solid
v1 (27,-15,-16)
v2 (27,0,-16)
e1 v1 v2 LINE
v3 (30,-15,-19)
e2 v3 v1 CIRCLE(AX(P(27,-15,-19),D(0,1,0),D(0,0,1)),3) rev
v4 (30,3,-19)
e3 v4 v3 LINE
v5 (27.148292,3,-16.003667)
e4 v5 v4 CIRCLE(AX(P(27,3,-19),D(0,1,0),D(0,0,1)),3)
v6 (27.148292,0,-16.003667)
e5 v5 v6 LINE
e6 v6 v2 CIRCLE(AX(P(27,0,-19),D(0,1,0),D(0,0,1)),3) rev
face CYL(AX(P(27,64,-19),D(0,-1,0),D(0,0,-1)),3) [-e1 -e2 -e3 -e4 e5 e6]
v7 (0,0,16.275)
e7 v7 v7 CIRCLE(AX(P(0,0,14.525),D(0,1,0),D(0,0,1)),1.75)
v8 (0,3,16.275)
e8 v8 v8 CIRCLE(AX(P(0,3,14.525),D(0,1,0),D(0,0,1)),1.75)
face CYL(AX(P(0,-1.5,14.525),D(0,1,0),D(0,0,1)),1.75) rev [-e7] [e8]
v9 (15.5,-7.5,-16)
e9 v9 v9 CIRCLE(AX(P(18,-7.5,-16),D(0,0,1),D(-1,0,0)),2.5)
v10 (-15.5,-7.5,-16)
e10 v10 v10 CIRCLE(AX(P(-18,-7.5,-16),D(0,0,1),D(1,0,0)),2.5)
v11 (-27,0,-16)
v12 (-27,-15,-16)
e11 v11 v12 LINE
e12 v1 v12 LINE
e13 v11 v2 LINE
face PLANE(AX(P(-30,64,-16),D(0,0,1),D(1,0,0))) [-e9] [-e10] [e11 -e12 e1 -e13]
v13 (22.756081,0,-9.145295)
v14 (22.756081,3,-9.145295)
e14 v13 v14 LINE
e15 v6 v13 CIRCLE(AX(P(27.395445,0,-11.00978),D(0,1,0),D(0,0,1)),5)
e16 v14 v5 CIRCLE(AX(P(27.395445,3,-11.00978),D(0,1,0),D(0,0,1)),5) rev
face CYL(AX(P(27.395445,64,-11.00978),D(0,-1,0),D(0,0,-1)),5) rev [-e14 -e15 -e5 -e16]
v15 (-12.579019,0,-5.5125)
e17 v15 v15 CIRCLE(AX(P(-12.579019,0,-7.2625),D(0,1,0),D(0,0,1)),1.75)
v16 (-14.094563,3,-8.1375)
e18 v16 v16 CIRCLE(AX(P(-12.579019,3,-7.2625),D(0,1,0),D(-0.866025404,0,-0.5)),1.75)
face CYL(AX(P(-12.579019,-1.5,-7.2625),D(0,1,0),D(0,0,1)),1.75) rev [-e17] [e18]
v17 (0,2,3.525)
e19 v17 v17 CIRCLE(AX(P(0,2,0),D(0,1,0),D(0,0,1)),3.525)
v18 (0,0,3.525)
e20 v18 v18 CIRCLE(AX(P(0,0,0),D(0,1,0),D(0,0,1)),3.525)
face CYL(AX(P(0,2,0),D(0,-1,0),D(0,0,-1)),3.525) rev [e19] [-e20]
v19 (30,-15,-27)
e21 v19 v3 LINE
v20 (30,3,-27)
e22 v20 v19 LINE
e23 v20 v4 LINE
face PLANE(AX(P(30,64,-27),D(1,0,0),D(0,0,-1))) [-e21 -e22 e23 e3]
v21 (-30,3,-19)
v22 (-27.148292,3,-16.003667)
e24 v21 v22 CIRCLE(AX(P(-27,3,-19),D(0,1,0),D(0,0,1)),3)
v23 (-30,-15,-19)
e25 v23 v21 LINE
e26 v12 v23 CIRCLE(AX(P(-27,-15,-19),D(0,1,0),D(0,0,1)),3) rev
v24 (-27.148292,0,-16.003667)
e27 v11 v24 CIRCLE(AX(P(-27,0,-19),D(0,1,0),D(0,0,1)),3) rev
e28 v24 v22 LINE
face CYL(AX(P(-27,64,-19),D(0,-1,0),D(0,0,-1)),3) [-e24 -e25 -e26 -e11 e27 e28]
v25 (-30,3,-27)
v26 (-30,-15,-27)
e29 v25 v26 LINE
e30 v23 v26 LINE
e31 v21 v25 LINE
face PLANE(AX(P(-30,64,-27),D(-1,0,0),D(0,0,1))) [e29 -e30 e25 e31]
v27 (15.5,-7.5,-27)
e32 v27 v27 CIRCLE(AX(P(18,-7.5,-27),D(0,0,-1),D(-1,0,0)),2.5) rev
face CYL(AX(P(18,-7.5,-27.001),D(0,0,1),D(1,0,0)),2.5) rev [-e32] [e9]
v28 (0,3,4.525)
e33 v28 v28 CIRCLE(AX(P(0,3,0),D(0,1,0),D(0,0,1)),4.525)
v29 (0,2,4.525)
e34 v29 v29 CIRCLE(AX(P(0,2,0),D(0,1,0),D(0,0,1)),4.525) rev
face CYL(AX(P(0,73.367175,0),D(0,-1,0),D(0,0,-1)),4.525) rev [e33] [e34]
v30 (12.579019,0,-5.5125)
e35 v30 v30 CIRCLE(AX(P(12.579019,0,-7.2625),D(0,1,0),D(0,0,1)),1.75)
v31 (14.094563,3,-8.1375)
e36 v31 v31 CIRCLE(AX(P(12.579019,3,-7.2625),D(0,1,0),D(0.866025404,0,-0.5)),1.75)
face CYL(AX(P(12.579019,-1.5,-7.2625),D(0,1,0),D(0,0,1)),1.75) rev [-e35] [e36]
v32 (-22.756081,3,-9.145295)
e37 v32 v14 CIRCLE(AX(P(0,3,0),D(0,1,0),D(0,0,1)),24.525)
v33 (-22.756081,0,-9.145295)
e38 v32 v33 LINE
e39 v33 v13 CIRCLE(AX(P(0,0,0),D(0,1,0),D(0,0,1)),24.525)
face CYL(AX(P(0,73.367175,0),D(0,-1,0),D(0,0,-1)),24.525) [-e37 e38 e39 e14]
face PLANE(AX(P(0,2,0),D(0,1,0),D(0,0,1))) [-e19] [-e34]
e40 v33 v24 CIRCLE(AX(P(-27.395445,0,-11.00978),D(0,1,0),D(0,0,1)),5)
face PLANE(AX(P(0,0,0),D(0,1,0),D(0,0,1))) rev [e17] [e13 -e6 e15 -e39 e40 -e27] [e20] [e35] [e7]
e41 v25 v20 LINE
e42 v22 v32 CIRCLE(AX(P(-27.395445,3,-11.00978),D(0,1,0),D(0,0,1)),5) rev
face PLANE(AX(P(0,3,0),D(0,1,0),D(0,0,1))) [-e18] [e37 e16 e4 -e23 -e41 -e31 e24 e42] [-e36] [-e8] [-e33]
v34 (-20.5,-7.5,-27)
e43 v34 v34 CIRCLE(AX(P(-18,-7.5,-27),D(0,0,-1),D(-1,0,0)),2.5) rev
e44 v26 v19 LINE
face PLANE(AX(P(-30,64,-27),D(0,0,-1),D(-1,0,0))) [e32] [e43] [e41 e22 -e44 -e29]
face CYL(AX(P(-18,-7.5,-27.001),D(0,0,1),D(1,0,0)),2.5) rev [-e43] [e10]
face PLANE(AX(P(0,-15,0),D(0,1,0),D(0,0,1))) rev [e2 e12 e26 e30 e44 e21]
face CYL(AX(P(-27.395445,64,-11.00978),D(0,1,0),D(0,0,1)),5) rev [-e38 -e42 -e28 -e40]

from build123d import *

# Parameters (mm, degrees)
SKETCH1_R                       = 4.525
SKETCH1_R_2                     = 3.525
BOSS_EXTRUDE1_DEPTH             = 2
SKETCH1_5_R                     = 24.525
SKETCH1_5_R_2                   = 4.525
BOSS_EXTRUDE3_DEPTH             = 3
SKETCH2_R                       = 1.75
CUT_EXTRUDE1_DEPTH              = 4.5
CIRPATTERN1_COUNT               = 3
SKETCH9_W                       = 60
SKETCH9_H                       = 11
BOSS_EXTRUDE7_DEPTH             = 15
BOSS_EXTRUDE7_DIRECTION_2_REACH = 36.813
CUT_EXTRUDE3_REACH              = 54.605
SKETCH10_R                      = 2.5
FILLET4_R                       = 3
FILLET5_R                       = 5


with BuildPart() as part:
    # Sketch1 → Boss-Extrude1 (new body)
    with BuildSketch(Plane(origin=(0, 0, 0), x_dir=(1, 0, 0), z_dir=(0, 1, 0))):
        with Locations(Location((0, 0, 0), (0, 0, 270))):
            Circle(SKETCH1_R)
        with Locations(Location((0, 0, 0), (0, 0, 270))):
            Circle(SKETCH1_R_2, mode=Mode.SUBTRACT)
    extrude(amount=BOSS_EXTRUDE1_DEPTH)

    # Sketch1<5> → Boss-Extrude3 (add)
    with BuildSketch(Plane(origin=(0, 0, 0), x_dir=(1, 0, 0), z_dir=(0, 1, 0))):
        with Locations(Location((0, 0, 0), (0, 0, 270))):
            Circle(SKETCH1_5_R)
        with Locations(Location((0, 0, 0), (0, 0, 270))):
            Circle(SKETCH1_5_R_2, mode=Mode.SUBTRACT)
    extrude(amount=BOSS_EXTRUDE3_DEPTH)

    # Sketch2 → Cut-Extrude1 (cut)
    with BuildSketch(Plane(origin=(0, 3, 0), x_dir=(1, 0, 0), z_dir=(0, 1, 0))):
        with Locations(Location((0, -14.525, 0), (0, 0, 270))):
            Circle(SKETCH2_R)
    cut_extrude1 = extrude(amount=-CUT_EXTRUDE1_DEPTH, mode=Mode.SUBTRACT)

    # CirPattern1: Cut-Extrude1 ×3 about axis
    cirpattern1_axis = Axis((0, 0, 0), (0, 1, 0))
    for i in range(1, CIRPATTERN1_COUNT):
        add(cut_extrude1.rotate(cirpattern1_axis, i * 360 / CIRPATTERN1_COUNT), mode=Mode.SUBTRACT)

    # Sketch9 → Boss-Extrude7 (add)
    with BuildSketch(Plane.XZ):
        with Locations((0, -21.5)):
            Rectangle(SKETCH9_W, SKETCH9_H)
    extrude(amount=BOSS_EXTRUDE7_DEPTH)

    # Boss-Extrude7 direction 2: up to this face of the body (flat: up to its plane)
    boss_extrude7_direction_2_end = Plane(part.part.faces().sort_by_distance((0, 3, -23.831328248))[0])
    # Sketch9 → Boss-Extrude7 direction 2 (add, up to the picked face)
    with BuildSketch(Plane.XZ, mode=Mode.PRIVATE) as boss_extrude7_direction_2_sk1:
        with Locations((0, -21.5)):
            Rectangle(SKETCH9_W, SKETCH9_H)
    boss_extrude7_direction_2_tool1 = split(extrude(boss_extrude7_direction_2_sk1.sketch, amount=-BOSS_EXTRUDE7_DIRECTION_2_REACH, mode=Mode.PRIVATE), bisect_by=boss_extrude7_direction_2_end, keep=Keep.BOTH, mode=Mode.PRIVATE)
    add(boss_extrude7_direction_2_tool1.solids().sort_by(Axis((0, 0, -21.5), (0, 1, 0)))[0])

    # Sketch10 → Cut-Extrude3 (cut, up to next)
    with BuildSketch(Plane.XY.offset(-16), mode=Mode.PRIVATE) as cut_extrude3_sk1:
        with Locations((-18, -7.5)):
            Circle(SKETCH10_R)
    cut_extrude3_tool1 = extrude(cut_extrude3_sk1.sketch, amount=-CUT_EXTRUDE3_REACH, mode=Mode.PRIVATE) & part.part
    # Sketch10 → Cut-Extrude3 (cut, up to next)
    with BuildSketch(Plane.XY.offset(-16), mode=Mode.PRIVATE) as cut_extrude3_sk2:
        with Locations(Location((18, -7.5, 0), (0, 0, 180))):
            Circle(SKETCH10_R)
    cut_extrude3_tool2 = extrude(cut_extrude3_sk2.sketch, amount=-CUT_EXTRUDE3_REACH, mode=Mode.PRIVATE) & part.part
    add(cut_extrude3_tool1.solids().sort_by_distance((-18, -7.5, -16))[0], mode=Mode.SUBTRACT)
    add(cut_extrude3_tool2.solids().sort_by_distance((18, -7.5, -16))[0], mode=Mode.SUBTRACT)

    # Fillet4
    fillet4_edges = [part.edges().sort_by_distance(p)[0] for p in [
        (-30, -6, -16),
        (30, -6, -16),
    ]]
    fillet(fillet4_edges, radius=FILLET4_R)

    # Fillet5
    # the kernel refuses this fillet: 5 mm, written as the material it adds along each edge
    with BuildSketch(Plane(origin=(-18.586974606, 3, -16), x_dir=(-0.999999908254526, 0, -0.0004283584240869523), z_dir=(0, -1, 0))) as fillet5_piece_1:
        with BuildLine():
            CenterArc((8.806331501, -4.993993224), FILLET5_R, 92.808774222, 109.061067494)
            Line((4.166169243, -6.856489993), (3.702153017, -7.04273967))
            ThreePointArc((3.702153017, -7.04273967), (1.938057952, -3.516366711), (-0.379079034, -0.326035406))
            Line((-0.379079034, -0.326035406), (0.000214179, 0.499999954))
            ThreePointArc((0.000214179, 0.499999954), (8.413238801, 0.496396164), (8.536816511, 0.499399322))
            Line((8.536816511, 0.499399322), (8.561317874, 0))
        make_face()
    extrude(amount=3)
    with BuildSketch(Plane(origin=(18.586974606, 3, -16), x_dir=(0.999999908254526, 0, -0.0004283584240865375), z_dir=(0, -1, 0))) as fillet5_piece_2:
        with BuildLine():
            CenterArc((8.806331501, 4.993993224), FILLET5_R, 158.130158283, 109.061067494)
            Line((4.166169243, 6.856489993), (3.702153017, 7.04273967))
            ThreePointArc((3.702153017, 7.04273967), (1.938057952, 3.516366711), (-0.379079034, 0.326035406))
            Line((-0.379079034, 0.326035406), (0.000214179, -0.499999954))
            ThreePointArc((0.000214179, -0.499999954), (8.413238801, -0.496396164), (8.536816511, -0.499399322))
            Line((8.536816511, -0.499399322), (8.561317874, 0))
        make_face()
    extrude(amount=3)


solid = part.part
